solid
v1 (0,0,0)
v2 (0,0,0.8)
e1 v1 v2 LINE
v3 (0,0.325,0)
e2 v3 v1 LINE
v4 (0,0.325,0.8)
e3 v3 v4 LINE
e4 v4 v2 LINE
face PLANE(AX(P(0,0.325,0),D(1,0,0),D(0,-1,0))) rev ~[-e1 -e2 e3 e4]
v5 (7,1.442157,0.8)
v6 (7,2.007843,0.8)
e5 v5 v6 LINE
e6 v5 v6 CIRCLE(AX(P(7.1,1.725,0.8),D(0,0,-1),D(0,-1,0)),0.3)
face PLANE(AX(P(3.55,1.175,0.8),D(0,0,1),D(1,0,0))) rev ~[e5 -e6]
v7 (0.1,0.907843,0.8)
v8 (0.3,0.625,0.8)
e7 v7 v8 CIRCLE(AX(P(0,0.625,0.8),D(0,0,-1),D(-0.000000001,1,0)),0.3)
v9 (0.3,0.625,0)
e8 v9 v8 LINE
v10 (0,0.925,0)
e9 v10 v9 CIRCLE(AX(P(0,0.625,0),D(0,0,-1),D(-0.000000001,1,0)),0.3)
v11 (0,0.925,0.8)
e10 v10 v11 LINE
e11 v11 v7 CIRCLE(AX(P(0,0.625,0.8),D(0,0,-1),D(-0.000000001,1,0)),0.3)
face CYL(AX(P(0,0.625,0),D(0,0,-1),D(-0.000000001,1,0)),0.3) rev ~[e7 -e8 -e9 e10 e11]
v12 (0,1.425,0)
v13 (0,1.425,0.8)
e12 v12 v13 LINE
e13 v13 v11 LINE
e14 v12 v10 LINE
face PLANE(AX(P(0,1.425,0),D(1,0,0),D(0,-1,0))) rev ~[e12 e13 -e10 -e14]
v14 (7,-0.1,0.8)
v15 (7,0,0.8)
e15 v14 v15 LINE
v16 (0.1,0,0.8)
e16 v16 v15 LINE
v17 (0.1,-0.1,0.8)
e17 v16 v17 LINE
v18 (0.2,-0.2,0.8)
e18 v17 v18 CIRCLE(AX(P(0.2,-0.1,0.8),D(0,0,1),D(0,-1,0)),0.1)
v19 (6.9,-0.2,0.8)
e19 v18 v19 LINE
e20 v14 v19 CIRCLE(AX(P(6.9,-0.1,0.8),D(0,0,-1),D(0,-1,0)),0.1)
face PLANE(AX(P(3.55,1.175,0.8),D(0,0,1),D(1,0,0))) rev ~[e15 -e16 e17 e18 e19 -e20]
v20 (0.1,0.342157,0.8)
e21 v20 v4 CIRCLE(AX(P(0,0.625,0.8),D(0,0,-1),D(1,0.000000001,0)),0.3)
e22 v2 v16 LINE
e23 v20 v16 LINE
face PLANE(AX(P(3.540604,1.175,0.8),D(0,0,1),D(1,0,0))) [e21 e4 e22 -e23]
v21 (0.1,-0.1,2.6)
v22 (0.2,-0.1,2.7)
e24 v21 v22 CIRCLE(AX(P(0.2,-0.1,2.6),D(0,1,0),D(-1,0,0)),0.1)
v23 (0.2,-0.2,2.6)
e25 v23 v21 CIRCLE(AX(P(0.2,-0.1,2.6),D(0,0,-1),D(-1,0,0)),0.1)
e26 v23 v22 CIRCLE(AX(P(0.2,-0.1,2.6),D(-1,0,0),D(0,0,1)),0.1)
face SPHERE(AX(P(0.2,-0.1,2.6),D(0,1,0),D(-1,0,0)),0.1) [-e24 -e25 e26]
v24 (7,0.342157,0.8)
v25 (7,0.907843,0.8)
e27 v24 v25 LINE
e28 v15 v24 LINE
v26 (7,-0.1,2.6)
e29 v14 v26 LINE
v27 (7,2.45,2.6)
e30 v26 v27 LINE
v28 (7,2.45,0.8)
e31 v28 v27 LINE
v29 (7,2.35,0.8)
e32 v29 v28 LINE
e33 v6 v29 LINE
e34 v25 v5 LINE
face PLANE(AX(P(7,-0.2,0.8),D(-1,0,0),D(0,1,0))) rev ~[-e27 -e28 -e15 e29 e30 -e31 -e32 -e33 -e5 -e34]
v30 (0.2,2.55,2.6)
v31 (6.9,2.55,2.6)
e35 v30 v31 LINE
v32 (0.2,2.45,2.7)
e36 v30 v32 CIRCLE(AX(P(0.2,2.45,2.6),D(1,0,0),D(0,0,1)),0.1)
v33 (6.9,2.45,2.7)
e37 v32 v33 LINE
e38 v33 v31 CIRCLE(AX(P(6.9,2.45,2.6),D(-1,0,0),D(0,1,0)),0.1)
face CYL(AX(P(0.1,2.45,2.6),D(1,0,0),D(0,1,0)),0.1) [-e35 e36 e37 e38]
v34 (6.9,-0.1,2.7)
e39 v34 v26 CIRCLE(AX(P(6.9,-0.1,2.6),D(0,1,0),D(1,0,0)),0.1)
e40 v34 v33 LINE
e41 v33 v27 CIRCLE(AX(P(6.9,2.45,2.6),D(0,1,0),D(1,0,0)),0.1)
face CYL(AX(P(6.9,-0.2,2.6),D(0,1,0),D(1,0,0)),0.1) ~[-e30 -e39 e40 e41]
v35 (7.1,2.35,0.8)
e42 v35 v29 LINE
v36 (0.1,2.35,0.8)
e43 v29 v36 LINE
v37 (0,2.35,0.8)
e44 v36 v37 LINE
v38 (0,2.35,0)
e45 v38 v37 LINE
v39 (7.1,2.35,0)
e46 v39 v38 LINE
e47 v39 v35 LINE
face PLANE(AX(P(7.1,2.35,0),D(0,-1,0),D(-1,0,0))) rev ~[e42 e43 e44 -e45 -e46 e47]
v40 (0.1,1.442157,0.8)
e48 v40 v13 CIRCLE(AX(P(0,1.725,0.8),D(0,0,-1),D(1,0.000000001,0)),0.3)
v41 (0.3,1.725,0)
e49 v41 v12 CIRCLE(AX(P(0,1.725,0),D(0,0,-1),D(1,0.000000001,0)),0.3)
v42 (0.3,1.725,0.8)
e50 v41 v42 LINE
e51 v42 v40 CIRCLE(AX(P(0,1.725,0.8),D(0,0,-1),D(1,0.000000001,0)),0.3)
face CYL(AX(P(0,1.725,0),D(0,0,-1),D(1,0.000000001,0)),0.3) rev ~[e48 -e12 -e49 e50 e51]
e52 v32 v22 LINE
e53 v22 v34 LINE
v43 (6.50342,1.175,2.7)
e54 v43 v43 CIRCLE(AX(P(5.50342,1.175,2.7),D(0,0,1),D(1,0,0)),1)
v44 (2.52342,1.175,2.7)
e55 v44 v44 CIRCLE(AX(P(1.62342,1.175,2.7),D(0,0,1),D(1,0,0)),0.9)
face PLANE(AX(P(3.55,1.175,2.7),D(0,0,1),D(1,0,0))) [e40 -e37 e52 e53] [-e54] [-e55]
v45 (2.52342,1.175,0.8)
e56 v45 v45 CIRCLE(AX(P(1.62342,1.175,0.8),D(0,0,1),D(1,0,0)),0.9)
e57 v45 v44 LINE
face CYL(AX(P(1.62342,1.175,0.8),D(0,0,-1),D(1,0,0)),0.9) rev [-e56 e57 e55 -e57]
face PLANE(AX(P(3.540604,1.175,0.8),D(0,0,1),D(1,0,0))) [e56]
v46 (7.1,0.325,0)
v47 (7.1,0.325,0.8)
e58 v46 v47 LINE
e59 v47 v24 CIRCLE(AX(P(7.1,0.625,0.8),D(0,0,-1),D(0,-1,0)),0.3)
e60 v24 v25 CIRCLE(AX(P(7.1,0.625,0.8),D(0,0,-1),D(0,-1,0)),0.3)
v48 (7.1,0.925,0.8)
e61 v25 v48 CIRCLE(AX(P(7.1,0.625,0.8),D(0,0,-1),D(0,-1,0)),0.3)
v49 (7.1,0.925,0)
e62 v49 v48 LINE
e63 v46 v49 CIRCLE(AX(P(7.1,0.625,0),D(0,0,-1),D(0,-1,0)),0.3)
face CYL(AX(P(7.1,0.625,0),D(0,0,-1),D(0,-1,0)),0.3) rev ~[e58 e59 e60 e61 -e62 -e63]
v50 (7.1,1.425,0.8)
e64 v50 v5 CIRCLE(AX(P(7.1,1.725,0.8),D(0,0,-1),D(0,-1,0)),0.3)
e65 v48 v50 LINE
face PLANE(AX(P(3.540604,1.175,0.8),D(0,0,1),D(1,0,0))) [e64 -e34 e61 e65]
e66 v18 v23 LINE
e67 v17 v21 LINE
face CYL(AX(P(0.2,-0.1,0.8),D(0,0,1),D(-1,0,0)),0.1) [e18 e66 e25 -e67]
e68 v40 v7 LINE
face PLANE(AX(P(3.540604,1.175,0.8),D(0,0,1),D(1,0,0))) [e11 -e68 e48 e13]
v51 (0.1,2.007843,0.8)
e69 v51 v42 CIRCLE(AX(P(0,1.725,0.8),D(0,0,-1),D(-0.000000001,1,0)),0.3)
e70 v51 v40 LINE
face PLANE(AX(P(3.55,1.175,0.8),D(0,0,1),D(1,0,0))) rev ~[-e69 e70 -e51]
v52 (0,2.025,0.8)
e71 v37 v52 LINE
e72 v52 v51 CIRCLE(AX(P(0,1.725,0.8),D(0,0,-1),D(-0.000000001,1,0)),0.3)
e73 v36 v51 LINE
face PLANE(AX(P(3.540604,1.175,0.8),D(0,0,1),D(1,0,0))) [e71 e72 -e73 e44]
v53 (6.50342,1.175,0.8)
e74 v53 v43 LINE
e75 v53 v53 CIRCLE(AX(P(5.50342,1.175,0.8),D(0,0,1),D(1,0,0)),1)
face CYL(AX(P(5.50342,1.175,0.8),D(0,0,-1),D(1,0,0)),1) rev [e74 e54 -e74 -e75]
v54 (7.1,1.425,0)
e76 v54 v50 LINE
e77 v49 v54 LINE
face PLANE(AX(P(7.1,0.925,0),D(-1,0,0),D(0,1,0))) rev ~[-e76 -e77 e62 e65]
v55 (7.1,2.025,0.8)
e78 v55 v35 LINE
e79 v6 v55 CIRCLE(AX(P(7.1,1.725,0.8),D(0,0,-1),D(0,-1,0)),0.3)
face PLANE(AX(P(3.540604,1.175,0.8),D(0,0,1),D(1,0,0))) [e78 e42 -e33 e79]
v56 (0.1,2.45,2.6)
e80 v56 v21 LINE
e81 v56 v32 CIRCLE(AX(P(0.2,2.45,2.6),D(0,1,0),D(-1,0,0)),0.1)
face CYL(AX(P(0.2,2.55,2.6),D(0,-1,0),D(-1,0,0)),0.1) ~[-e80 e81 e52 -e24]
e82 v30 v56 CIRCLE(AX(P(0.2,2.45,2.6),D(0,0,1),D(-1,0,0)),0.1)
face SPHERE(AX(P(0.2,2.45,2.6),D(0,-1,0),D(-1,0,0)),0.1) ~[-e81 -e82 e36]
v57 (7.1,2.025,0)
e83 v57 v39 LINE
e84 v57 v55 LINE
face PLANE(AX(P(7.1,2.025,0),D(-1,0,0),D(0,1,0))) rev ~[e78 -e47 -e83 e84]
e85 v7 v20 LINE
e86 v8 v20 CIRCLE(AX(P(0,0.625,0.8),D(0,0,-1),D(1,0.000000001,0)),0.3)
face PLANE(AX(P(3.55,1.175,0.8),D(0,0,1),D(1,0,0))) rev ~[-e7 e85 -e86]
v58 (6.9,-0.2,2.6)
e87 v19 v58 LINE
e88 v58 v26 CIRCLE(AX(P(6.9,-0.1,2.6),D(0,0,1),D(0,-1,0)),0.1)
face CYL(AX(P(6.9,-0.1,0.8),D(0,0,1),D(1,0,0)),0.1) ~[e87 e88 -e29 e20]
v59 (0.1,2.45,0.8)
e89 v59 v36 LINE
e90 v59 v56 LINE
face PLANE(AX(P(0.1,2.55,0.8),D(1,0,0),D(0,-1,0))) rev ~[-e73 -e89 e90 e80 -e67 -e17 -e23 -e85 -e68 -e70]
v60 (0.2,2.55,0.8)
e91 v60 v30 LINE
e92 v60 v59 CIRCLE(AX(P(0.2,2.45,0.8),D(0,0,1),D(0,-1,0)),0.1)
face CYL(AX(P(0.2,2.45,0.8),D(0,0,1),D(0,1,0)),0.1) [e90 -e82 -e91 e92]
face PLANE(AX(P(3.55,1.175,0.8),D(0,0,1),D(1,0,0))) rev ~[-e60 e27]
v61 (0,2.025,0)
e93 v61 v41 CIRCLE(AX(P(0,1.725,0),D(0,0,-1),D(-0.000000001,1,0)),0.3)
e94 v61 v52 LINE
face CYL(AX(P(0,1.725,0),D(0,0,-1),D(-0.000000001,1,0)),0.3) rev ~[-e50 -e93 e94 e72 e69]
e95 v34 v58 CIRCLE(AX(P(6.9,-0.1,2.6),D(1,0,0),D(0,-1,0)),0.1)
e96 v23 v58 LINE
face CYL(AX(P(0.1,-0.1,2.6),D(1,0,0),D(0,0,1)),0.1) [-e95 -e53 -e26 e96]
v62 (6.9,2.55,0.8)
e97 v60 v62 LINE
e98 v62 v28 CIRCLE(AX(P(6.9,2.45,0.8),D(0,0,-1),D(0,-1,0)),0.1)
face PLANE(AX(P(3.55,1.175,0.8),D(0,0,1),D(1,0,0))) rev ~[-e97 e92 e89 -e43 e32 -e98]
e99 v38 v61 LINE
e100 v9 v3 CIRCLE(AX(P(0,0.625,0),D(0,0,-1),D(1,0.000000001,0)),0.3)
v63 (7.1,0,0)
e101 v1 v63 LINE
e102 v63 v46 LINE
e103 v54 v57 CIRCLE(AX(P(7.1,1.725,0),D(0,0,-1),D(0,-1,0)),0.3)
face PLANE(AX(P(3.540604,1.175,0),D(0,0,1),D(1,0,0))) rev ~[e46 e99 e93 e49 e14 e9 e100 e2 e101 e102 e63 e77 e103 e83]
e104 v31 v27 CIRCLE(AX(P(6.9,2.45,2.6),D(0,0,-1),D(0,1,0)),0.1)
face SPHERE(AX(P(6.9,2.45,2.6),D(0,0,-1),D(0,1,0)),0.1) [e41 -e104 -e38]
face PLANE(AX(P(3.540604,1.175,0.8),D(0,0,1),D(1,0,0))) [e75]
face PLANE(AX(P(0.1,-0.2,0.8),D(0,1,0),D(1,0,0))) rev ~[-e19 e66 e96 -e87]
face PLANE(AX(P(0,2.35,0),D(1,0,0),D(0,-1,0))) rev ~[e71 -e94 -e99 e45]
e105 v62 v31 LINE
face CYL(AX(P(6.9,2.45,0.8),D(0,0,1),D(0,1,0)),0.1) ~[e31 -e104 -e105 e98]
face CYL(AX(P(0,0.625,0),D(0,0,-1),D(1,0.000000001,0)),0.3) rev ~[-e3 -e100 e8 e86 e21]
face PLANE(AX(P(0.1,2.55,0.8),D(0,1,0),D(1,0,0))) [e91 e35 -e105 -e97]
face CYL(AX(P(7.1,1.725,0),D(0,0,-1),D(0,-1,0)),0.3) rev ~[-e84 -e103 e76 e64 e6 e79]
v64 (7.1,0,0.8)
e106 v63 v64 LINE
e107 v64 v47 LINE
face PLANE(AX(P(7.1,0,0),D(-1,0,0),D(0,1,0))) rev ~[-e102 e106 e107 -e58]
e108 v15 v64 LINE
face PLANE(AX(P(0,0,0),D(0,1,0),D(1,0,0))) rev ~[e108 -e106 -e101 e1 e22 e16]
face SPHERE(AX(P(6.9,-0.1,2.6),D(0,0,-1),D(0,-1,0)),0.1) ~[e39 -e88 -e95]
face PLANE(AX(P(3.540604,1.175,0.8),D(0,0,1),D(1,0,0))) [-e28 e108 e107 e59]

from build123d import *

# Parameters (mm, degrees)
F1_DEPTH = 0.8
F2_R     = 0.9
F2_R_2   = 1
F2_W     = 6.9
F2_H     = 0.2
F3_DEPTH = 1.9
F4_R     = 0.1


with BuildPart() as f1:
    # F0 (on Top) → F1 (new body)
    with BuildSketch(Plane.XY):
        with BuildLine():
            Line((0, 0.325), (0, 0))
            Line((0, 0), (7.1, 0))
            Line((7.1, 0), (7.1, 0.325))
            ThreePointArc((7.1, 0.325), (6.8, 0.625), (7.1, 0.925))
            Line((7.1, 0.925), (7.1, 1.425))
            ThreePointArc((7.1, 1.425), (6.8, 1.725), (7.1, 2.025))
            Line((7.1, 2.025), (7.1, 2.35))
            Line((7.1, 2.35), (0, 2.35))
            Line((0, 2.35), (0, 2.025))
            ThreePointArc((0, 2.025), (0.2121320344, 1.9371320344), (0.3, 1.725))
            ThreePointArc((0.3, 1.725), (0.2121320344, 1.5128679656), (0, 1.425))
            Line((0, 1.425), (0, 0.925))
            ThreePointArc((0, 0.925), (0.2121320344, 0.8371320344), (0.3, 0.625))
            ThreePointArc((0.3, 0.625), (0.2121320344, 0.4128679656), (0, 0.325))
        make_face()
    extrude(amount=F1_DEPTH)

    # F2 (on face) → F3 (join)
    with BuildSketch(Plane.XY.offset(0.8)):
        with BuildLine():
            Line((7, 2.35), (0.1, 2.35))
            Line((0.1, 2.35), (0.1, 2.0078427125))
            ThreePointArc((0.1, 2.0078427125), (0.3, 1.725), (0.1, 1.4421572875))
            Line((0.1, 1.4421572875), (0.1, 0.9078427125))
            ThreePointArc((0.1, 0.9078427125), (0.3, 0.625), (0.1, 0.3421572875))
            Line((0.1, 0.3421572875), (0.1, 0))
            Line((0.1, 0), (7, 0))
            Line((7, 0), (7, 0.3421572875))
            ThreePointArc((7, 0.3421572875), (6.8, 0.625), (7, 0.9078427125))
            Line((7, 0.9078427125), (7, 1.4421572875))
            ThreePointArc((7, 1.4421572875), (6.8, 1.725), (7, 2.0078427125))
            Line((7, 2.0078427125), (7, 2.35))
        make_face()
        with Locations((1.6234196955, 1.175)):
            Circle(F2_R, mode=Mode.SUBTRACT)
        with Locations((5.5034196955, 1.175)):
            Circle(F2_R_2, mode=Mode.SUBTRACT)
        with Locations((3.55, 2.45)):
            Rectangle(F2_W, F2_H)
        with Locations((3.55, -0.1)):
            Rectangle(F2_W, F2_H)
        with BuildLine():
            ThreePointArc((0.1, 0.3421572875), (0.3, 0.625), (0.1, 0.9078427125))
            Line((0.1, 0.9078427125), (0.1, 0.3421572875))
        make_face()
        with BuildLine():
            ThreePointArc((0.1, 1.4421572875), (0.3, 1.725), (0.1, 2.0078427125))
            Line((0.1, 2.0078427125), (0.1, 1.4421572875))
        make_face()
        with BuildLine():
            Line((7, 1.4421572875), (7, 2.0078427125))
            ThreePointArc((7, 2.0078427125), (6.8, 1.725), (7, 1.4421572875))
        make_face()
        with BuildLine():
            Line((7, 0.3421572875), (7, 0.9078427125))
            ThreePointArc((7, 0.9078427125), (6.8, 0.625), (7, 0.3421572875))
        make_face()
    extrude(amount=F3_DEPTH)

    # F4
    f4_edges = [f1.edges().sort_by_distance(p)[0] for p in [
        (0.1, 1.175, 2.7),
        (0.1, -0.2, 1.75),
        (0.1, 2.55, 1.75),
        (7, -0.2, 1.75),
        (7, 2.55, 1.75),
        (3.55, 2.55, 2.7),
        (3.55, -0.2, 2.7),
        (7, 1.175, 2.7),
    ]]
    fillet(f4_edges, radius=F4_R)


solid = f1.part
